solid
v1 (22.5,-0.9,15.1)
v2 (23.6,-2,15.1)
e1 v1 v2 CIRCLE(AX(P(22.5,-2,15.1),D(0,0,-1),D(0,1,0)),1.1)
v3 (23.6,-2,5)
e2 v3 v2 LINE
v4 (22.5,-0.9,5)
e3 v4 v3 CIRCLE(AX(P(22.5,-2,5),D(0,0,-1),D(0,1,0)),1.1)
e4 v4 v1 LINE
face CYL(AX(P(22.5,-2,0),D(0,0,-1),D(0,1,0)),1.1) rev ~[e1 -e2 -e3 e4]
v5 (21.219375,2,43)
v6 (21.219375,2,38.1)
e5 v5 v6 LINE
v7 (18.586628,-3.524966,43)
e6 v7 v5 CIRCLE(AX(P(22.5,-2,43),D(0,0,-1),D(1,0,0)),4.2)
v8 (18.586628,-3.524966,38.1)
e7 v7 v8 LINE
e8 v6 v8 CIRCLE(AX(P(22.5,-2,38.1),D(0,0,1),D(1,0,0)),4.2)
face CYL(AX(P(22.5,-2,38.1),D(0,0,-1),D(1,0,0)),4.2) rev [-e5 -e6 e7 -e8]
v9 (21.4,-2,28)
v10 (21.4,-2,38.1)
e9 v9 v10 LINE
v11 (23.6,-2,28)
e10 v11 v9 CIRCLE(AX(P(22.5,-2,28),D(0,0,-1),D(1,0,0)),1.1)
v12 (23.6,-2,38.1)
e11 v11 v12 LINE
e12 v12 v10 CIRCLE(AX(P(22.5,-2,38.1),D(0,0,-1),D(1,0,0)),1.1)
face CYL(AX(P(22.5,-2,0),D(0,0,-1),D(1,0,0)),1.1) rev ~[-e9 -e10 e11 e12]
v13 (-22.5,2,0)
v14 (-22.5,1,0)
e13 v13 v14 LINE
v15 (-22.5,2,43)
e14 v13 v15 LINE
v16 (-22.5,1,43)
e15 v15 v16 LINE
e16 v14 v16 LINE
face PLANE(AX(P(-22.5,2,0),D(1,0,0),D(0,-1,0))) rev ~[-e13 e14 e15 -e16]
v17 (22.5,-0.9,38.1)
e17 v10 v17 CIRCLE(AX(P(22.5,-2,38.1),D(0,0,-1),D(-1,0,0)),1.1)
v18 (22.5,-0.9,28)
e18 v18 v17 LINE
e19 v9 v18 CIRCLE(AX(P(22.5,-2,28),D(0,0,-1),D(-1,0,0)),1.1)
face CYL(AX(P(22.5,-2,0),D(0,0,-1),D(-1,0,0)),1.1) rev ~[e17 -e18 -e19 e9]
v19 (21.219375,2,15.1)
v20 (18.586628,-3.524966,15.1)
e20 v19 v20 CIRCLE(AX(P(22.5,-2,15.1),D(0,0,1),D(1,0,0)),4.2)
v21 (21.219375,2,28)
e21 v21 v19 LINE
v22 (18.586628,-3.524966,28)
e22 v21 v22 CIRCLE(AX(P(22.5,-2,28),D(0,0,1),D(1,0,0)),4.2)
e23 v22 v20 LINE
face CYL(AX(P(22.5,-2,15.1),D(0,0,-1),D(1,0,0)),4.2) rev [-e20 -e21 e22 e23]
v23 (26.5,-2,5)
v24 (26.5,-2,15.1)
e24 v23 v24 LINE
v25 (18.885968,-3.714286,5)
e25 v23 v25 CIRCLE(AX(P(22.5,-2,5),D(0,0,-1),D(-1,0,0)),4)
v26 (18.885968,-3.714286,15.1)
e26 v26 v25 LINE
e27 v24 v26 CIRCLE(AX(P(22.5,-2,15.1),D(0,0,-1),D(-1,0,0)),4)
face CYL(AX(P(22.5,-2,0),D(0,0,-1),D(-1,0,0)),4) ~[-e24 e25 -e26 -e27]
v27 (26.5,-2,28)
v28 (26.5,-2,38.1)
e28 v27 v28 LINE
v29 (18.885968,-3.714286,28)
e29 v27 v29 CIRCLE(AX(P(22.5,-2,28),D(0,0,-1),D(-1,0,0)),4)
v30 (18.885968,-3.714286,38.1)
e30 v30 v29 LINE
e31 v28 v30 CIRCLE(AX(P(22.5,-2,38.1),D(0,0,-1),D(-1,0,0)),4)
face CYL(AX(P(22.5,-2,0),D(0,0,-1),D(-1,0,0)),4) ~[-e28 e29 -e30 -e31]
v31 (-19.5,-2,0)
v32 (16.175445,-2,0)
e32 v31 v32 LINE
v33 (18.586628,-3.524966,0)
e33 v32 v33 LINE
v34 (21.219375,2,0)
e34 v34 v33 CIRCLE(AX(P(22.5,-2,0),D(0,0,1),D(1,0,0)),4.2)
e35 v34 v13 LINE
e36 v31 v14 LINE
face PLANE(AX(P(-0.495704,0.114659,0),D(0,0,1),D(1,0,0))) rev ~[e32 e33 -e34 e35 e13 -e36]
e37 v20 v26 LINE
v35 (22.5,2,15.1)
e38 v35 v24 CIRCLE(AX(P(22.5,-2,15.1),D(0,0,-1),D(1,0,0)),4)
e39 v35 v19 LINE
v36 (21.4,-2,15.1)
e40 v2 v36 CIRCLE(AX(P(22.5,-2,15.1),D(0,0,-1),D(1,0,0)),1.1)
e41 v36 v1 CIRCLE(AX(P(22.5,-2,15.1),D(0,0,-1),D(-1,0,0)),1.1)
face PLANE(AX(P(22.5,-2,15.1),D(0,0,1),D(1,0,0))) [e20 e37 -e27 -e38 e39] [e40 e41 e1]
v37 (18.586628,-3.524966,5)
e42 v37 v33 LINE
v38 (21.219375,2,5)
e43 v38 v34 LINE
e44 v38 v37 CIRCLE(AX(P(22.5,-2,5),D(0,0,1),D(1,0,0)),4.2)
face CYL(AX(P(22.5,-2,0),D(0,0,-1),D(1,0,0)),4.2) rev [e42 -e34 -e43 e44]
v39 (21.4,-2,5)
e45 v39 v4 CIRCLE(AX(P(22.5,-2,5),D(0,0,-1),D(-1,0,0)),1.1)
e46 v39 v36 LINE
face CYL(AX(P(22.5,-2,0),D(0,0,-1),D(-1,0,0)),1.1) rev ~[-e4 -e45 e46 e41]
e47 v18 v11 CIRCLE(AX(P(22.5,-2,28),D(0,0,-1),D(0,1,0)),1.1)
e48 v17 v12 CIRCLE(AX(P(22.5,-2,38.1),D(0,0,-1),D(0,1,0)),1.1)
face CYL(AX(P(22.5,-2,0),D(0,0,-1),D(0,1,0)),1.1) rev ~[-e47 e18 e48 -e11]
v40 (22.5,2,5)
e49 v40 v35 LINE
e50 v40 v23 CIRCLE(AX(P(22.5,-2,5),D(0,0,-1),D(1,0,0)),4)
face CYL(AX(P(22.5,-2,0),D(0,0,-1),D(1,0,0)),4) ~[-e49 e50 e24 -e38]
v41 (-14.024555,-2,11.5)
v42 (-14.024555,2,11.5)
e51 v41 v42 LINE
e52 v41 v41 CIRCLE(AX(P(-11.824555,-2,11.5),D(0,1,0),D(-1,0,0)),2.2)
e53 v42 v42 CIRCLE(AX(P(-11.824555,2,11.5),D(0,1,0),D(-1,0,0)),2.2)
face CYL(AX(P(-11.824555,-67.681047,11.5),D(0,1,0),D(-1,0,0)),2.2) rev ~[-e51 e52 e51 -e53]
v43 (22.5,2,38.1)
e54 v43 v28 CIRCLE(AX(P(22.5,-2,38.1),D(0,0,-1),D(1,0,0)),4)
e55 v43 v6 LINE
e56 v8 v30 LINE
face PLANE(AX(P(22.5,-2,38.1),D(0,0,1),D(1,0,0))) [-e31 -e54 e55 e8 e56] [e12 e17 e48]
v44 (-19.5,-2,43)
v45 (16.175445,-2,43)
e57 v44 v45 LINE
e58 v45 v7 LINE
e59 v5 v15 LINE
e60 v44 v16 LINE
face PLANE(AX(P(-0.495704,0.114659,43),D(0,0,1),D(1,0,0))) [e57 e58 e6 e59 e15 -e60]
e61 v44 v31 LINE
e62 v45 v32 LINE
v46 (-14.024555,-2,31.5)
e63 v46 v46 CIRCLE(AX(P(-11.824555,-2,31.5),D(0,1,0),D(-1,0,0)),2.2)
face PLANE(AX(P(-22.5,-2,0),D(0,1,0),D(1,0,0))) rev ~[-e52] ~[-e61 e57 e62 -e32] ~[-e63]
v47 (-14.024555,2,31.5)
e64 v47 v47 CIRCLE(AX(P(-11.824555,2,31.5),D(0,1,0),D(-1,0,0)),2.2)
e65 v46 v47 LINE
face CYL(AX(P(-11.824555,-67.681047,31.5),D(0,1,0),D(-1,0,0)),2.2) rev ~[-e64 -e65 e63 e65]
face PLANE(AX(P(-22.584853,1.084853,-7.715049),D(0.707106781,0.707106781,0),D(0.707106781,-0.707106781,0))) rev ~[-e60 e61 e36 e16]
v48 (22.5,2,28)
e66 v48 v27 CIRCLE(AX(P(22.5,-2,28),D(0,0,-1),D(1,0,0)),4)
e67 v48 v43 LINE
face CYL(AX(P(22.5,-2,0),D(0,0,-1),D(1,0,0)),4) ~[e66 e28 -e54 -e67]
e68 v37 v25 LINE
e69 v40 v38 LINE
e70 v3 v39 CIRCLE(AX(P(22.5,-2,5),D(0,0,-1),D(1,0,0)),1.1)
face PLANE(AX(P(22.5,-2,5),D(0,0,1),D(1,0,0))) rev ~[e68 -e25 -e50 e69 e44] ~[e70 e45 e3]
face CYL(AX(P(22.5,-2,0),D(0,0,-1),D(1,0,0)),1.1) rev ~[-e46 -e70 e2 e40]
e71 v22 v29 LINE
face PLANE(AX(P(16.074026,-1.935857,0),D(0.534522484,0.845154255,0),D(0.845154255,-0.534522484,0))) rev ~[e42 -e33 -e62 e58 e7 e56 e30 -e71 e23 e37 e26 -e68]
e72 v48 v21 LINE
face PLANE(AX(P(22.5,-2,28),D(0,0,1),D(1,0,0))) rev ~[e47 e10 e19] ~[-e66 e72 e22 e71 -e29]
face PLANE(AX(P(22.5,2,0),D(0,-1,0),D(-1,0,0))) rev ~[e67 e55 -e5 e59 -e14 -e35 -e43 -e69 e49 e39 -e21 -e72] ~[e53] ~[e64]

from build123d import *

# Parameters (mm, degrees)
F1_DEPTH    = 43
F2_T1_DEPTH = 43
F2_T3_DEPTH = 58.4300979278
F4_D        = 4.4
F5_R        = 4.2
F6_DEPTH    = 5
F7_START    = 15.1
F7_DEPTH    = 12.9
F8_START    = 38.1
F8_DEPTH    = 11.9


# Not quite as in the source:
# - a fillet or chamfer that OpenCascade refuses, or shapes differently, is made with other operations: its cross-section is extruded or revolved along the edge and cut away or added


with BuildPart() as f1:
    # F0 (on Top) → F1 (new body)
    with BuildSketch(Plane.XY):
        with BuildLine():
            Line((-22.5, -2), (18.5, -2))
            ThreePointArc((18.5, -2), (19.6715728753, 0.8284271247), (22.5, 2))
            Line((22.5, 2), (-22.5, 2))
            Line((-22.5, 2), (-22.5, -2))
        make_face()
        with BuildLine():
            Line((18.5, -2), (21.4, -2))
            ThreePointArc((21.4, -2), (21.7221825407, -1.2221825407), (22.5, -0.9))
            Line((22.5, -0.9), (22.5, 2))
            ThreePointArc((22.5, 2), (19.6715728753, 0.8284271247), (18.5, -2))
        make_face()
        with BuildLine():
            ThreePointArc((23.6, -2), (22.5, -3.1), (21.4, -2))
            Line((21.4, -2), (18.5, -2))
            ThreePointArc((18.5, -2), (22.5, -6), (26.5, -2))
            ThreePointArc((26.5, -2), (25.3284271247, 0.8284271247), (22.5, 2))
            Line((22.5, 2), (22.5, -0.9))
            ThreePointArc((22.5, -0.9), (23.2778174593, -1.2221825407), (23.6, -2))
        make_face()
    extrude(amount=F1_DEPTH)

    # F2: chamfer of 3 on 2 edges, made by hand

    # F2_s2 → F2_t1 (join)
    with BuildSketch(Plane.XY):
        with BuildLine():
            Line((16.0740261691, -1.9358573019), (18.9873868989, -3.7784284123))
            Line((18.9873868989, -3.7784284123), (19.0415973731, -3.7527141266))
            ThreePointArc((19.0415973731, -3.7527141266), (18.6659635809, -2.9076148618), (18.56, -2))
            Line((18.56, -2), (18.5, -1.94))
            ThreePointArc((18.5, -1.94), (17.2870130845, -1.94), (16.0740261691, -1.8758573019))
            Line((16.0740261691, -1.8758573019), (16.0740261691, -1.9358573019))
        make_face()
    extrude(amount=F2_T1_DEPTH)

    # F2_s4 → F2_t3 (cut)
    with BuildSketch(Plane.XY.offset(-7.7150489639)):
        with BuildLine():
            Line((-22.5848528137, 1.0848528137), (-19.4151471863, -2.0848528137))
            Line((-19.4151471863, -2.0848528137), (-19.4151471863, -2.1448528137))
            ThreePointArc((-19.4151471863, -2.1448528137), (-20.9575735931, -2.06), (-22.5, -2.06))
            Line((-22.5, -2.06), (-22.56, -2))
            ThreePointArc((-22.56, -2), (-22.56, -0.4575735931), (-22.6448528137, 1.0848528137))
            Line((-22.6448528137, 1.0848528137), (-22.5848528137, 1.0848528137))
        make_face()
    extrude(amount=F2_T3_DEPTH, mode=Mode.SUBTRACT)

    # F4 (through all)
    with Locations(Plane.XZ.offset(2)):
        with Locations((-11.8245553203, 31.5), (-11.8245553203, 11.5)):
            Hole(F4_D / 2)

    # F5 (on face) → F6 (cut)
    with BuildSketch(Plane.XY):
        with Locations((22.5, -2)):
            Circle(F5_R)
    extrude(amount=F6_DEPTH, mode=Mode.SUBTRACT)

    # F5 (on face) → F7 (cut)
    with BuildSketch(Plane.XY.offset(F7_START)):
        with Locations((22.5, -2)):
            Circle(F5_R)
    extrude(amount=F7_DEPTH, mode=Mode.SUBTRACT)

    # F5 (on face) → F8 (cut)
    with BuildSketch(Plane.XY.offset(F8_START)):
        with Locations((22.5, -2)):
            Circle(F5_R)
    extrude(amount=F8_DEPTH, mode=Mode.SUBTRACT)


solid = f1.part
